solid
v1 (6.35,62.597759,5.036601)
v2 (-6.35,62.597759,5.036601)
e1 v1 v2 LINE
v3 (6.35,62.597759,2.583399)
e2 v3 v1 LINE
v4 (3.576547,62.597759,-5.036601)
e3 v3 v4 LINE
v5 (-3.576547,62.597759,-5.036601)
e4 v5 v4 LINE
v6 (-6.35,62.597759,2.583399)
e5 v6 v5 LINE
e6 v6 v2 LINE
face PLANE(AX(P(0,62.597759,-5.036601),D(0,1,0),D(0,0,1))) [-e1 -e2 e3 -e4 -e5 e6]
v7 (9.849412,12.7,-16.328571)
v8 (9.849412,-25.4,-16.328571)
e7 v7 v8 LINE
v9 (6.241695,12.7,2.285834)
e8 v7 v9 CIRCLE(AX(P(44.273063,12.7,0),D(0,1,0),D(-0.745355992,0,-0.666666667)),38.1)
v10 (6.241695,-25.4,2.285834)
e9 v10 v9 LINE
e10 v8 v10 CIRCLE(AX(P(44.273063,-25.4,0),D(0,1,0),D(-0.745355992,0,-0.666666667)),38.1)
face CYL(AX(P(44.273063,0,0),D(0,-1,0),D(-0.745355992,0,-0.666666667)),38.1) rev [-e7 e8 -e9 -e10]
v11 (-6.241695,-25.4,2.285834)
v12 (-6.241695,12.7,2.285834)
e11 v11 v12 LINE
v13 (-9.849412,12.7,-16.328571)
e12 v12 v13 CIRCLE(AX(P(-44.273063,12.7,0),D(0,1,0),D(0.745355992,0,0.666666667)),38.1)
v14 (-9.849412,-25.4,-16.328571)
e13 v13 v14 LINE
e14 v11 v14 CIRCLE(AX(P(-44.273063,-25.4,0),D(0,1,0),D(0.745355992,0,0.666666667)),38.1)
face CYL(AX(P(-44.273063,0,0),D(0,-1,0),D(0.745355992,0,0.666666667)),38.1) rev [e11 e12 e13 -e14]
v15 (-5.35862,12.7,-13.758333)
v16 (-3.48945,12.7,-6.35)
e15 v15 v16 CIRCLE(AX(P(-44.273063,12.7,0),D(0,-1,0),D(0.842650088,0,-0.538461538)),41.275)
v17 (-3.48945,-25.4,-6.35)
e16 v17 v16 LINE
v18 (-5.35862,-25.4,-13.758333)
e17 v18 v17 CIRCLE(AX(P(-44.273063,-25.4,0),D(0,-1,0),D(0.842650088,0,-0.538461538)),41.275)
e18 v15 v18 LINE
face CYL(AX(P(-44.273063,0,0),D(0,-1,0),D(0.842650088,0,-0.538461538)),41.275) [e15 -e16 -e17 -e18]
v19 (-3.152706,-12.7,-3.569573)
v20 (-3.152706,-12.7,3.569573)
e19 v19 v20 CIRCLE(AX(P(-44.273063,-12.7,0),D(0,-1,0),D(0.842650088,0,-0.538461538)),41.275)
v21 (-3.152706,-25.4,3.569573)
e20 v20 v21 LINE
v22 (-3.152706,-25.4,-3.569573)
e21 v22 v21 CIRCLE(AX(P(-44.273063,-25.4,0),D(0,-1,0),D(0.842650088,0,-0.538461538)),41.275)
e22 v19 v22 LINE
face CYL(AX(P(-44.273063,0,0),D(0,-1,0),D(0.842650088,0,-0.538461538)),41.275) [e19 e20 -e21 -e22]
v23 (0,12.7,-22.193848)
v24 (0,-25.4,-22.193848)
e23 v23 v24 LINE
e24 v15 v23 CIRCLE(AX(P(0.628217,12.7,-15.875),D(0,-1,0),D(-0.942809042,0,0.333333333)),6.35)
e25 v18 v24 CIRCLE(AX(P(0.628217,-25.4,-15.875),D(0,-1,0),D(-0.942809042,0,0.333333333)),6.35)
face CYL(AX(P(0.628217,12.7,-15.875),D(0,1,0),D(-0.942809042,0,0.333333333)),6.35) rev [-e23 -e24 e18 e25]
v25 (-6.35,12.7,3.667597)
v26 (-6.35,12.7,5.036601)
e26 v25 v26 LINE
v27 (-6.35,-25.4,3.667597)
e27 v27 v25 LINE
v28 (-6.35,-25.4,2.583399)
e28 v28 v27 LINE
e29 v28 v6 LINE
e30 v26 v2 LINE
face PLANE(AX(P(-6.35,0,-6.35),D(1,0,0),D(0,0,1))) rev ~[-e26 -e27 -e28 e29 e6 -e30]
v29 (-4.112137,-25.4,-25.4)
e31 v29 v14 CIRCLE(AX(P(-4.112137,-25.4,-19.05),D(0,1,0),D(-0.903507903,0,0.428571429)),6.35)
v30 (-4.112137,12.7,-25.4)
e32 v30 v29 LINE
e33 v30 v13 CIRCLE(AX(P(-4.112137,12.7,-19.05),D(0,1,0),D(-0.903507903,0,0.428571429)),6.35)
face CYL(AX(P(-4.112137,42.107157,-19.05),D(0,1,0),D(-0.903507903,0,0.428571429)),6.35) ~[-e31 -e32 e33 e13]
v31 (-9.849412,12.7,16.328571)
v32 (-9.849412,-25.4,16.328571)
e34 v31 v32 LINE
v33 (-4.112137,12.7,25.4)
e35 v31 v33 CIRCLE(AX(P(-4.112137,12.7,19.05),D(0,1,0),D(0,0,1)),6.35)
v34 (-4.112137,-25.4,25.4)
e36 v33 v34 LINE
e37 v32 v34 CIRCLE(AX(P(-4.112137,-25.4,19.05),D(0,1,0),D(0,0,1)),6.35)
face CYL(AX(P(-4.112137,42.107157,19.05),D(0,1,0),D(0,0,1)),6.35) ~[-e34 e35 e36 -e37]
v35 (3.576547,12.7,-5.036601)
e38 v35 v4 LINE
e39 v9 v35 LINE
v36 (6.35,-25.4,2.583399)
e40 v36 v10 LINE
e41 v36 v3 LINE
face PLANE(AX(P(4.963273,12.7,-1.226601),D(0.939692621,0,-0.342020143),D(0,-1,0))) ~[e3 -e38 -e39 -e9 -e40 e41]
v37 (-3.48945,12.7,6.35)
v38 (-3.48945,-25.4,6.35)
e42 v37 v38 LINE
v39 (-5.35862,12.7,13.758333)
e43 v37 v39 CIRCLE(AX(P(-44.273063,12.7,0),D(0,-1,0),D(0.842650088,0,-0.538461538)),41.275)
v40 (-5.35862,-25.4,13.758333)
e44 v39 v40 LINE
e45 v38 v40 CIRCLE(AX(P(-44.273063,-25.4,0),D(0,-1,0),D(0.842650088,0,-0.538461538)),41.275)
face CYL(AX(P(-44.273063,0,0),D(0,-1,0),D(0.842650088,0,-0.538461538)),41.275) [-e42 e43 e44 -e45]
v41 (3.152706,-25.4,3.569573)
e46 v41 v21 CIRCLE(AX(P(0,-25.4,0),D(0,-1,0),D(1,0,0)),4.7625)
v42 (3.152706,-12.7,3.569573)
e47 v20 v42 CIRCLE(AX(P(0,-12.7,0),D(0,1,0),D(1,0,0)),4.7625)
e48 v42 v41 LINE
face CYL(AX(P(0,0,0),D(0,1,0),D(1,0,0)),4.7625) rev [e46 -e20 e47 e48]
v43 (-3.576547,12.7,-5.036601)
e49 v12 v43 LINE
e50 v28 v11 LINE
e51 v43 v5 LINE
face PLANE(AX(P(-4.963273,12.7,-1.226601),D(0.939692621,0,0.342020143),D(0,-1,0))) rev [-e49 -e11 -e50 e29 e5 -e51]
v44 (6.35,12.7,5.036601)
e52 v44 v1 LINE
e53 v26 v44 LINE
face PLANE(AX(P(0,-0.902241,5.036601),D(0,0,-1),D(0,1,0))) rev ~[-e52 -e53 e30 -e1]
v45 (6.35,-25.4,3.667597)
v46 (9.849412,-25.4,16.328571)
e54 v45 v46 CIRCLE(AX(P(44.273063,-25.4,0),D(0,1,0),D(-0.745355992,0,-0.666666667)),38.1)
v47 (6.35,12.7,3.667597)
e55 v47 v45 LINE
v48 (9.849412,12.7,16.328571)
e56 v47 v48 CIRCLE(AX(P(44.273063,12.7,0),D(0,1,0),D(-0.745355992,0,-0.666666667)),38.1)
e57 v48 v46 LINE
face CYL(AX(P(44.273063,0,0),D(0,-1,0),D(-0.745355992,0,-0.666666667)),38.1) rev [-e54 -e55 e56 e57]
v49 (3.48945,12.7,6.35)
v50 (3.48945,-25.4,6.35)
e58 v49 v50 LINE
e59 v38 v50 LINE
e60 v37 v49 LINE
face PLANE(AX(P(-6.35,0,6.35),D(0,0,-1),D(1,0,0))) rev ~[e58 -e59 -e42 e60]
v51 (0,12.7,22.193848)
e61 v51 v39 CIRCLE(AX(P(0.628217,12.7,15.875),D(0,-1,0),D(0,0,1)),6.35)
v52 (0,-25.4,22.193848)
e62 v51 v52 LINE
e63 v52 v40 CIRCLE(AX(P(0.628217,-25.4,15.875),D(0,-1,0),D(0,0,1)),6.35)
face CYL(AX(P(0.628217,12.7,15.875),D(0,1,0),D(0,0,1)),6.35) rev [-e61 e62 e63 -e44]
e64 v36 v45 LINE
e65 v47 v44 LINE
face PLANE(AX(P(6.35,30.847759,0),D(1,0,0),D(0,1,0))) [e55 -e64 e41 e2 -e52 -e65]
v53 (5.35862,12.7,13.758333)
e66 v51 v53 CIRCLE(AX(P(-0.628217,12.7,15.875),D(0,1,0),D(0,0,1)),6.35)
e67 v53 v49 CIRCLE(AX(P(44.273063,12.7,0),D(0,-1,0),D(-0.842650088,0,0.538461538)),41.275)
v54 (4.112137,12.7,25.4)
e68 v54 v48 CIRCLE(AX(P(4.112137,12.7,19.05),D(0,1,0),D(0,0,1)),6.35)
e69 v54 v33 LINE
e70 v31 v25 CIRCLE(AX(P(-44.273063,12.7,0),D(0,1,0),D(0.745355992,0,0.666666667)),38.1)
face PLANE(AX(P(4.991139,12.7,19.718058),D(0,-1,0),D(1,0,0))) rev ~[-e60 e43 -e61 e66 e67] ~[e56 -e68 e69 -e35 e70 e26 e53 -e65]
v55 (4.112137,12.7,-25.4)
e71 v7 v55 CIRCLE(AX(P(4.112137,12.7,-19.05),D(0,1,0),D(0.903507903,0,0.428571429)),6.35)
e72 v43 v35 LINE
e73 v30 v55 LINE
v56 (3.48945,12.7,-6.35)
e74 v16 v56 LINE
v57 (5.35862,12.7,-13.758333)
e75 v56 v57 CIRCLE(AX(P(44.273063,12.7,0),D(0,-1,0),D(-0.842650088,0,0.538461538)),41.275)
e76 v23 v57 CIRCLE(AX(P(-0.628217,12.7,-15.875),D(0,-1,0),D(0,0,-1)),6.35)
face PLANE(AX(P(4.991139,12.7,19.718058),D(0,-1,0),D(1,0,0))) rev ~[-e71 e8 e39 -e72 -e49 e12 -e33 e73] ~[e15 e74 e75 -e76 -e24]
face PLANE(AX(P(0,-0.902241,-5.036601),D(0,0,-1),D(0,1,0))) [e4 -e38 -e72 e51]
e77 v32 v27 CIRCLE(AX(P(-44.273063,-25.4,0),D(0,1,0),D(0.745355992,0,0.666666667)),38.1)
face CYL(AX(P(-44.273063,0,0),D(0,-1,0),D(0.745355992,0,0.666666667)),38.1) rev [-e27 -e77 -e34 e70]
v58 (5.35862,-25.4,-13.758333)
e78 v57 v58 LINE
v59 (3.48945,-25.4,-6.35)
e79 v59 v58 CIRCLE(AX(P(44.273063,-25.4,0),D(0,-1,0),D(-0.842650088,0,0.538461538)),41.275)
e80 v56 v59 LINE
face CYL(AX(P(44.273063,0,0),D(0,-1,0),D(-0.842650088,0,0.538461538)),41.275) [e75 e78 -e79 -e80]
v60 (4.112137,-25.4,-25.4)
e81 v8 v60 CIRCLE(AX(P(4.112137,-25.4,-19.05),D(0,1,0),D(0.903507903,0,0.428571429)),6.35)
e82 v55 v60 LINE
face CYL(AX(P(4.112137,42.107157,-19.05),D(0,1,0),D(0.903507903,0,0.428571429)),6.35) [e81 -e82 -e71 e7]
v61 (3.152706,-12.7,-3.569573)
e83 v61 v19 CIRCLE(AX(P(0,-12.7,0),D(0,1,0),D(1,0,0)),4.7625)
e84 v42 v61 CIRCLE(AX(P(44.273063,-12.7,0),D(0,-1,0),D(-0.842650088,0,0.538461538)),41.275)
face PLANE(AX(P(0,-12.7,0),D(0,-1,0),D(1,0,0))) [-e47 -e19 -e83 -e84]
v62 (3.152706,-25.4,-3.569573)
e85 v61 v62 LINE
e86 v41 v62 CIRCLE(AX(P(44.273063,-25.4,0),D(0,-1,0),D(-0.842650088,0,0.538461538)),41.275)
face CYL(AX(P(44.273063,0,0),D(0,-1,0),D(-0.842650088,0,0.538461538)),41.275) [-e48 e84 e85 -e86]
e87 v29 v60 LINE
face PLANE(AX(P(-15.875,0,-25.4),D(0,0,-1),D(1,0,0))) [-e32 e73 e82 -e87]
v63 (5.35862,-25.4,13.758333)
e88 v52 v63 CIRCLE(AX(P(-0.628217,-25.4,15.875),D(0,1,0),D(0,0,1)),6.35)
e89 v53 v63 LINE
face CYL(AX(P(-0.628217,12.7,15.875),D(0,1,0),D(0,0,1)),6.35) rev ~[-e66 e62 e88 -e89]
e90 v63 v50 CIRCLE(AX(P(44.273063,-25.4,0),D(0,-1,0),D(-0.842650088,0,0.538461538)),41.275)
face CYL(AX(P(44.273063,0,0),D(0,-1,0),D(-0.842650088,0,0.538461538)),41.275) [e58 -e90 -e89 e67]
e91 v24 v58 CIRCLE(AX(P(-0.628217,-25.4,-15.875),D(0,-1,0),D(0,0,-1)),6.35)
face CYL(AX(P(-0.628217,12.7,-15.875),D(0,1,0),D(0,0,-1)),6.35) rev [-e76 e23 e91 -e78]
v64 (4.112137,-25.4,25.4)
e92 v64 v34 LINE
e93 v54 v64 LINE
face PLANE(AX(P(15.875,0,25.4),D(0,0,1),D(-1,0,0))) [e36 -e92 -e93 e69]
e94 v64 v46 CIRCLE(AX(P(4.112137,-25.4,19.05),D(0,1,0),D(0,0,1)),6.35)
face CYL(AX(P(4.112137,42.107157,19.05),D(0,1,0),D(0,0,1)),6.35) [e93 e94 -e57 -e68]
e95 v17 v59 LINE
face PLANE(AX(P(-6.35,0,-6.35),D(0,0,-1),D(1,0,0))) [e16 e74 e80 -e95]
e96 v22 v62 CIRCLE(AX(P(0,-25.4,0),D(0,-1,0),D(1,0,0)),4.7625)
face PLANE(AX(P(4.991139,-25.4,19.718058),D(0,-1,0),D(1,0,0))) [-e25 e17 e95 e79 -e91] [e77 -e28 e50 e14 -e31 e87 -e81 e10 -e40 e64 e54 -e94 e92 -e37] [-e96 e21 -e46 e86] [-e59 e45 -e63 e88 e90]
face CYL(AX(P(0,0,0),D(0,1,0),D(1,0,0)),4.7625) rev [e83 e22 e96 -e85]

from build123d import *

# Parameters (mm, degrees)
F1_DEPTH      = 25.4
F1_DEPTH_BACK = 12.7
F2_T1_DEPTH   = 38.1
F2_T3_DEPTH   = 96.9143148495
F3_W          = 12.7
F3_H          = 12.7
F3_R          = 4.7625
F4_DEPTH      = 25.4
F5_W          = 12.7
F5_H          = 12.7
F6_DEPTH      = 12.7
F6_DEPTH_BACK = 12.7
F7_W          = 63.5
F7_H          = 10.0732017308
F8_DEPTH      = 6.35
F9_SIZE2      = 2.7734531851
F9_SIZE       = 7.62
F9_2_SIZE2    = 2.7734531851
F9_2_SIZE     = 7.62


# Not quite as in the source:
# - a fillet or chamfer that OpenCascade refuses, or shapes differently, is made with other operations: its cross-section is extruded or revolved along the edge and cut away or added


with BuildPart() as f1:
    # F0 (on Front) → F1 (new body, two sides)
    with BuildSketch(Plane.XZ) as f1_sk:
        with BuildLine():
            Line((15.875, 25.4), (-15.875, 25.4))
            ThreePointArc((-15.875, 25.4), (-6.1730633142, 0), (-15.875, -25.4))
            Line((-15.875, -25.4), (15.875, -25.4))
            ThreePointArc((15.875, -25.4), (6.1730633142, 0), (15.875, 25.4))
        make_face()
        with BuildLine():
            ThreePointArc((-9.4926809127, -22.225), (-2.9980633142, 0), (-9.4926809127, 22.225))
            Line((-9.4926809127, 22.225), (9.4926809127, 22.225))
            ThreePointArc((9.4926809127, 22.225), (2.9980633142, 0), (9.4926809127, -22.225))
            Line((9.4926809127, -22.225), (-9.4926809127, -22.225))
        make_face(mode=Mode.SUBTRACT)
    extrude(amount=F1_DEPTH)
    extrude(f1_sk.sketch, amount=-F1_DEPTH_BACK)

    # F2: fillet of radius 6.35 on 8 edges, made by hand

    # F2_s2 → F2_t1 (join)
    with BuildSketch(Plane.XZ.offset(-12.7)):
        with BuildLine():
            ThreePointArc((-0.6282172911, 22.225), (4.5565359978, 19.5411742094), (5.3586201229, 13.7583333333))
            ThreePointArc((5.3586201229, 13.7583333333), (7.1832676704, 18.1100161264), (9.4926809127, 22.225))
            Line((9.4926809127, 22.225), (-0.6282172911, 22.225))
        make_face()
        with BuildLine():
            ThreePointArc((-0.6282172911, -22.225), (4.5565359978, -19.5411742094), (5.3586201229, -13.7583333333))
            ThreePointArc((5.3586201229, -13.7583333333), (7.1832676704, -18.1100161264), (9.4926809127, -22.225))
            Line((9.4926809127, -22.225), (-0.6282172911, -22.225))
        make_face()
        with BuildLine():
            ThreePointArc((0.6282172911, 22.225), (-4.5565359978, 19.5411742094), (-5.3586201229, 13.7583333333))
            ThreePointArc((-5.3586201229, 13.7583333333), (-7.1832676704, 18.1100161264), (-9.4926809127, 22.225))
            Line((-9.4926809127, 22.225), (0.6282172911, 22.225))
        make_face()
        with BuildLine():
            ThreePointArc((-5.3586201229, -13.7583333333), (-4.5565359978, -19.5411742094), (0.6282172911, -22.225))
            Line((0.6282172911, -22.225), (-9.4926809127, -22.225))
            ThreePointArc((-9.4926809127, -22.225), (-7.1832676704, -18.1100161264), (-5.3586201229, -13.7583333333))
        make_face()
    extrude(amount=F2_T1_DEPTH)

    # F2_s4 → F2_t3 (cut)
    with BuildSketch(Plane.XZ.offset(-42.1071574247)):
        with BuildLine():
            ThreePointArc((-4.1121370301, 25.4), (-9.4788665476, 22.4442177723), (-9.8494122136, 16.3285714286))
            ThreePointArc((-9.8494122136, 16.3285714286), (-12.5364180191, 21.0806865498), (-15.875, 25.4))
            Line((-15.875, 25.4), (-4.1121370301, 25.4))
        make_face()
        with BuildLine():
            ThreePointArc((-9.8494122136, -16.3285714286), (-9.4788665476, -22.4442177723), (-4.1121370301, -25.4))
            Line((-4.1121370301, -25.4), (-15.875, -25.4))
            ThreePointArc((-15.875, -25.4), (-12.5364180191, -21.0806865498), (-9.8494122136, -16.3285714286))
        make_face()
        with BuildLine():
            ThreePointArc((4.1121370301, 25.4), (9.4788665476, 22.4442177723), (9.8494122136, 16.3285714286))
            ThreePointArc((9.8494122136, 16.3285714286), (12.5364180191, 21.0806865498), (15.875, 25.4))
            Line((15.875, 25.4), (4.1121370301, 25.4))
        make_face()
        with BuildLine():
            ThreePointArc((9.8494122136, -16.3285714286), (9.4788665476, -22.4442177723), (4.1121370301, -25.4))
            Line((4.1121370301, -25.4), (15.875, -25.4))
            ThreePointArc((15.875, -25.4), (12.5364180191, -21.0806865498), (9.8494122136, -16.3285714286))
        make_face()
    extrude(amount=F2_T3_DEPTH, mode=Mode.SUBTRACT)

    # F3 (on Front) → F4 (join)
    with BuildSketch(Plane.XZ):
        Rectangle(F3_W, F3_H)
        Circle(F3_R, mode=Mode.SUBTRACT)
    extrude(amount=F4_DEPTH)

    # F5 (on Front) → F6 (join, two sides)
    with BuildSketch(Plane.XZ) as f6_sk:
        Rectangle(F5_W, F5_H)
    extrude(amount=-F6_DEPTH)
    extrude(f6_sk.sketch, amount=F6_DEPTH_BACK)

    # F7 (on Right) → F8 (join, symmetric)
    with BuildSketch(Plane.YZ):
        with Locations((30.847759068, 0)):
            Rectangle(F7_W, F7_H)
    extrude(amount=F8_DEPTH, both=True)

    # F9
    f9_edges = [f1.edges().sort_by_distance(p)[0] for p in [
        (6.35, 37.64888, -5.036601),
    ]]
    f9_side = f1.faces().sort_by_distance((6.35, 21.926607, 0))[0]
    chamfer(f9_edges, length=F9_SIZE, length2=F9_SIZE2, reference=f9_side)

    # F9#2
    f9_2_edges = [f1.edges().sort_by_distance(p)[0] for p in [
        (-6.35, 37.64888, -5.036601),
    ]]
    f9_2_side = f1.faces().sort_by_distance((-6.35, 21.926607, 0))[0]
    chamfer(f9_2_edges, length=F9_2_SIZE, length2=F9_2_SIZE2, reference=f9_2_side)


solid = f1.part
